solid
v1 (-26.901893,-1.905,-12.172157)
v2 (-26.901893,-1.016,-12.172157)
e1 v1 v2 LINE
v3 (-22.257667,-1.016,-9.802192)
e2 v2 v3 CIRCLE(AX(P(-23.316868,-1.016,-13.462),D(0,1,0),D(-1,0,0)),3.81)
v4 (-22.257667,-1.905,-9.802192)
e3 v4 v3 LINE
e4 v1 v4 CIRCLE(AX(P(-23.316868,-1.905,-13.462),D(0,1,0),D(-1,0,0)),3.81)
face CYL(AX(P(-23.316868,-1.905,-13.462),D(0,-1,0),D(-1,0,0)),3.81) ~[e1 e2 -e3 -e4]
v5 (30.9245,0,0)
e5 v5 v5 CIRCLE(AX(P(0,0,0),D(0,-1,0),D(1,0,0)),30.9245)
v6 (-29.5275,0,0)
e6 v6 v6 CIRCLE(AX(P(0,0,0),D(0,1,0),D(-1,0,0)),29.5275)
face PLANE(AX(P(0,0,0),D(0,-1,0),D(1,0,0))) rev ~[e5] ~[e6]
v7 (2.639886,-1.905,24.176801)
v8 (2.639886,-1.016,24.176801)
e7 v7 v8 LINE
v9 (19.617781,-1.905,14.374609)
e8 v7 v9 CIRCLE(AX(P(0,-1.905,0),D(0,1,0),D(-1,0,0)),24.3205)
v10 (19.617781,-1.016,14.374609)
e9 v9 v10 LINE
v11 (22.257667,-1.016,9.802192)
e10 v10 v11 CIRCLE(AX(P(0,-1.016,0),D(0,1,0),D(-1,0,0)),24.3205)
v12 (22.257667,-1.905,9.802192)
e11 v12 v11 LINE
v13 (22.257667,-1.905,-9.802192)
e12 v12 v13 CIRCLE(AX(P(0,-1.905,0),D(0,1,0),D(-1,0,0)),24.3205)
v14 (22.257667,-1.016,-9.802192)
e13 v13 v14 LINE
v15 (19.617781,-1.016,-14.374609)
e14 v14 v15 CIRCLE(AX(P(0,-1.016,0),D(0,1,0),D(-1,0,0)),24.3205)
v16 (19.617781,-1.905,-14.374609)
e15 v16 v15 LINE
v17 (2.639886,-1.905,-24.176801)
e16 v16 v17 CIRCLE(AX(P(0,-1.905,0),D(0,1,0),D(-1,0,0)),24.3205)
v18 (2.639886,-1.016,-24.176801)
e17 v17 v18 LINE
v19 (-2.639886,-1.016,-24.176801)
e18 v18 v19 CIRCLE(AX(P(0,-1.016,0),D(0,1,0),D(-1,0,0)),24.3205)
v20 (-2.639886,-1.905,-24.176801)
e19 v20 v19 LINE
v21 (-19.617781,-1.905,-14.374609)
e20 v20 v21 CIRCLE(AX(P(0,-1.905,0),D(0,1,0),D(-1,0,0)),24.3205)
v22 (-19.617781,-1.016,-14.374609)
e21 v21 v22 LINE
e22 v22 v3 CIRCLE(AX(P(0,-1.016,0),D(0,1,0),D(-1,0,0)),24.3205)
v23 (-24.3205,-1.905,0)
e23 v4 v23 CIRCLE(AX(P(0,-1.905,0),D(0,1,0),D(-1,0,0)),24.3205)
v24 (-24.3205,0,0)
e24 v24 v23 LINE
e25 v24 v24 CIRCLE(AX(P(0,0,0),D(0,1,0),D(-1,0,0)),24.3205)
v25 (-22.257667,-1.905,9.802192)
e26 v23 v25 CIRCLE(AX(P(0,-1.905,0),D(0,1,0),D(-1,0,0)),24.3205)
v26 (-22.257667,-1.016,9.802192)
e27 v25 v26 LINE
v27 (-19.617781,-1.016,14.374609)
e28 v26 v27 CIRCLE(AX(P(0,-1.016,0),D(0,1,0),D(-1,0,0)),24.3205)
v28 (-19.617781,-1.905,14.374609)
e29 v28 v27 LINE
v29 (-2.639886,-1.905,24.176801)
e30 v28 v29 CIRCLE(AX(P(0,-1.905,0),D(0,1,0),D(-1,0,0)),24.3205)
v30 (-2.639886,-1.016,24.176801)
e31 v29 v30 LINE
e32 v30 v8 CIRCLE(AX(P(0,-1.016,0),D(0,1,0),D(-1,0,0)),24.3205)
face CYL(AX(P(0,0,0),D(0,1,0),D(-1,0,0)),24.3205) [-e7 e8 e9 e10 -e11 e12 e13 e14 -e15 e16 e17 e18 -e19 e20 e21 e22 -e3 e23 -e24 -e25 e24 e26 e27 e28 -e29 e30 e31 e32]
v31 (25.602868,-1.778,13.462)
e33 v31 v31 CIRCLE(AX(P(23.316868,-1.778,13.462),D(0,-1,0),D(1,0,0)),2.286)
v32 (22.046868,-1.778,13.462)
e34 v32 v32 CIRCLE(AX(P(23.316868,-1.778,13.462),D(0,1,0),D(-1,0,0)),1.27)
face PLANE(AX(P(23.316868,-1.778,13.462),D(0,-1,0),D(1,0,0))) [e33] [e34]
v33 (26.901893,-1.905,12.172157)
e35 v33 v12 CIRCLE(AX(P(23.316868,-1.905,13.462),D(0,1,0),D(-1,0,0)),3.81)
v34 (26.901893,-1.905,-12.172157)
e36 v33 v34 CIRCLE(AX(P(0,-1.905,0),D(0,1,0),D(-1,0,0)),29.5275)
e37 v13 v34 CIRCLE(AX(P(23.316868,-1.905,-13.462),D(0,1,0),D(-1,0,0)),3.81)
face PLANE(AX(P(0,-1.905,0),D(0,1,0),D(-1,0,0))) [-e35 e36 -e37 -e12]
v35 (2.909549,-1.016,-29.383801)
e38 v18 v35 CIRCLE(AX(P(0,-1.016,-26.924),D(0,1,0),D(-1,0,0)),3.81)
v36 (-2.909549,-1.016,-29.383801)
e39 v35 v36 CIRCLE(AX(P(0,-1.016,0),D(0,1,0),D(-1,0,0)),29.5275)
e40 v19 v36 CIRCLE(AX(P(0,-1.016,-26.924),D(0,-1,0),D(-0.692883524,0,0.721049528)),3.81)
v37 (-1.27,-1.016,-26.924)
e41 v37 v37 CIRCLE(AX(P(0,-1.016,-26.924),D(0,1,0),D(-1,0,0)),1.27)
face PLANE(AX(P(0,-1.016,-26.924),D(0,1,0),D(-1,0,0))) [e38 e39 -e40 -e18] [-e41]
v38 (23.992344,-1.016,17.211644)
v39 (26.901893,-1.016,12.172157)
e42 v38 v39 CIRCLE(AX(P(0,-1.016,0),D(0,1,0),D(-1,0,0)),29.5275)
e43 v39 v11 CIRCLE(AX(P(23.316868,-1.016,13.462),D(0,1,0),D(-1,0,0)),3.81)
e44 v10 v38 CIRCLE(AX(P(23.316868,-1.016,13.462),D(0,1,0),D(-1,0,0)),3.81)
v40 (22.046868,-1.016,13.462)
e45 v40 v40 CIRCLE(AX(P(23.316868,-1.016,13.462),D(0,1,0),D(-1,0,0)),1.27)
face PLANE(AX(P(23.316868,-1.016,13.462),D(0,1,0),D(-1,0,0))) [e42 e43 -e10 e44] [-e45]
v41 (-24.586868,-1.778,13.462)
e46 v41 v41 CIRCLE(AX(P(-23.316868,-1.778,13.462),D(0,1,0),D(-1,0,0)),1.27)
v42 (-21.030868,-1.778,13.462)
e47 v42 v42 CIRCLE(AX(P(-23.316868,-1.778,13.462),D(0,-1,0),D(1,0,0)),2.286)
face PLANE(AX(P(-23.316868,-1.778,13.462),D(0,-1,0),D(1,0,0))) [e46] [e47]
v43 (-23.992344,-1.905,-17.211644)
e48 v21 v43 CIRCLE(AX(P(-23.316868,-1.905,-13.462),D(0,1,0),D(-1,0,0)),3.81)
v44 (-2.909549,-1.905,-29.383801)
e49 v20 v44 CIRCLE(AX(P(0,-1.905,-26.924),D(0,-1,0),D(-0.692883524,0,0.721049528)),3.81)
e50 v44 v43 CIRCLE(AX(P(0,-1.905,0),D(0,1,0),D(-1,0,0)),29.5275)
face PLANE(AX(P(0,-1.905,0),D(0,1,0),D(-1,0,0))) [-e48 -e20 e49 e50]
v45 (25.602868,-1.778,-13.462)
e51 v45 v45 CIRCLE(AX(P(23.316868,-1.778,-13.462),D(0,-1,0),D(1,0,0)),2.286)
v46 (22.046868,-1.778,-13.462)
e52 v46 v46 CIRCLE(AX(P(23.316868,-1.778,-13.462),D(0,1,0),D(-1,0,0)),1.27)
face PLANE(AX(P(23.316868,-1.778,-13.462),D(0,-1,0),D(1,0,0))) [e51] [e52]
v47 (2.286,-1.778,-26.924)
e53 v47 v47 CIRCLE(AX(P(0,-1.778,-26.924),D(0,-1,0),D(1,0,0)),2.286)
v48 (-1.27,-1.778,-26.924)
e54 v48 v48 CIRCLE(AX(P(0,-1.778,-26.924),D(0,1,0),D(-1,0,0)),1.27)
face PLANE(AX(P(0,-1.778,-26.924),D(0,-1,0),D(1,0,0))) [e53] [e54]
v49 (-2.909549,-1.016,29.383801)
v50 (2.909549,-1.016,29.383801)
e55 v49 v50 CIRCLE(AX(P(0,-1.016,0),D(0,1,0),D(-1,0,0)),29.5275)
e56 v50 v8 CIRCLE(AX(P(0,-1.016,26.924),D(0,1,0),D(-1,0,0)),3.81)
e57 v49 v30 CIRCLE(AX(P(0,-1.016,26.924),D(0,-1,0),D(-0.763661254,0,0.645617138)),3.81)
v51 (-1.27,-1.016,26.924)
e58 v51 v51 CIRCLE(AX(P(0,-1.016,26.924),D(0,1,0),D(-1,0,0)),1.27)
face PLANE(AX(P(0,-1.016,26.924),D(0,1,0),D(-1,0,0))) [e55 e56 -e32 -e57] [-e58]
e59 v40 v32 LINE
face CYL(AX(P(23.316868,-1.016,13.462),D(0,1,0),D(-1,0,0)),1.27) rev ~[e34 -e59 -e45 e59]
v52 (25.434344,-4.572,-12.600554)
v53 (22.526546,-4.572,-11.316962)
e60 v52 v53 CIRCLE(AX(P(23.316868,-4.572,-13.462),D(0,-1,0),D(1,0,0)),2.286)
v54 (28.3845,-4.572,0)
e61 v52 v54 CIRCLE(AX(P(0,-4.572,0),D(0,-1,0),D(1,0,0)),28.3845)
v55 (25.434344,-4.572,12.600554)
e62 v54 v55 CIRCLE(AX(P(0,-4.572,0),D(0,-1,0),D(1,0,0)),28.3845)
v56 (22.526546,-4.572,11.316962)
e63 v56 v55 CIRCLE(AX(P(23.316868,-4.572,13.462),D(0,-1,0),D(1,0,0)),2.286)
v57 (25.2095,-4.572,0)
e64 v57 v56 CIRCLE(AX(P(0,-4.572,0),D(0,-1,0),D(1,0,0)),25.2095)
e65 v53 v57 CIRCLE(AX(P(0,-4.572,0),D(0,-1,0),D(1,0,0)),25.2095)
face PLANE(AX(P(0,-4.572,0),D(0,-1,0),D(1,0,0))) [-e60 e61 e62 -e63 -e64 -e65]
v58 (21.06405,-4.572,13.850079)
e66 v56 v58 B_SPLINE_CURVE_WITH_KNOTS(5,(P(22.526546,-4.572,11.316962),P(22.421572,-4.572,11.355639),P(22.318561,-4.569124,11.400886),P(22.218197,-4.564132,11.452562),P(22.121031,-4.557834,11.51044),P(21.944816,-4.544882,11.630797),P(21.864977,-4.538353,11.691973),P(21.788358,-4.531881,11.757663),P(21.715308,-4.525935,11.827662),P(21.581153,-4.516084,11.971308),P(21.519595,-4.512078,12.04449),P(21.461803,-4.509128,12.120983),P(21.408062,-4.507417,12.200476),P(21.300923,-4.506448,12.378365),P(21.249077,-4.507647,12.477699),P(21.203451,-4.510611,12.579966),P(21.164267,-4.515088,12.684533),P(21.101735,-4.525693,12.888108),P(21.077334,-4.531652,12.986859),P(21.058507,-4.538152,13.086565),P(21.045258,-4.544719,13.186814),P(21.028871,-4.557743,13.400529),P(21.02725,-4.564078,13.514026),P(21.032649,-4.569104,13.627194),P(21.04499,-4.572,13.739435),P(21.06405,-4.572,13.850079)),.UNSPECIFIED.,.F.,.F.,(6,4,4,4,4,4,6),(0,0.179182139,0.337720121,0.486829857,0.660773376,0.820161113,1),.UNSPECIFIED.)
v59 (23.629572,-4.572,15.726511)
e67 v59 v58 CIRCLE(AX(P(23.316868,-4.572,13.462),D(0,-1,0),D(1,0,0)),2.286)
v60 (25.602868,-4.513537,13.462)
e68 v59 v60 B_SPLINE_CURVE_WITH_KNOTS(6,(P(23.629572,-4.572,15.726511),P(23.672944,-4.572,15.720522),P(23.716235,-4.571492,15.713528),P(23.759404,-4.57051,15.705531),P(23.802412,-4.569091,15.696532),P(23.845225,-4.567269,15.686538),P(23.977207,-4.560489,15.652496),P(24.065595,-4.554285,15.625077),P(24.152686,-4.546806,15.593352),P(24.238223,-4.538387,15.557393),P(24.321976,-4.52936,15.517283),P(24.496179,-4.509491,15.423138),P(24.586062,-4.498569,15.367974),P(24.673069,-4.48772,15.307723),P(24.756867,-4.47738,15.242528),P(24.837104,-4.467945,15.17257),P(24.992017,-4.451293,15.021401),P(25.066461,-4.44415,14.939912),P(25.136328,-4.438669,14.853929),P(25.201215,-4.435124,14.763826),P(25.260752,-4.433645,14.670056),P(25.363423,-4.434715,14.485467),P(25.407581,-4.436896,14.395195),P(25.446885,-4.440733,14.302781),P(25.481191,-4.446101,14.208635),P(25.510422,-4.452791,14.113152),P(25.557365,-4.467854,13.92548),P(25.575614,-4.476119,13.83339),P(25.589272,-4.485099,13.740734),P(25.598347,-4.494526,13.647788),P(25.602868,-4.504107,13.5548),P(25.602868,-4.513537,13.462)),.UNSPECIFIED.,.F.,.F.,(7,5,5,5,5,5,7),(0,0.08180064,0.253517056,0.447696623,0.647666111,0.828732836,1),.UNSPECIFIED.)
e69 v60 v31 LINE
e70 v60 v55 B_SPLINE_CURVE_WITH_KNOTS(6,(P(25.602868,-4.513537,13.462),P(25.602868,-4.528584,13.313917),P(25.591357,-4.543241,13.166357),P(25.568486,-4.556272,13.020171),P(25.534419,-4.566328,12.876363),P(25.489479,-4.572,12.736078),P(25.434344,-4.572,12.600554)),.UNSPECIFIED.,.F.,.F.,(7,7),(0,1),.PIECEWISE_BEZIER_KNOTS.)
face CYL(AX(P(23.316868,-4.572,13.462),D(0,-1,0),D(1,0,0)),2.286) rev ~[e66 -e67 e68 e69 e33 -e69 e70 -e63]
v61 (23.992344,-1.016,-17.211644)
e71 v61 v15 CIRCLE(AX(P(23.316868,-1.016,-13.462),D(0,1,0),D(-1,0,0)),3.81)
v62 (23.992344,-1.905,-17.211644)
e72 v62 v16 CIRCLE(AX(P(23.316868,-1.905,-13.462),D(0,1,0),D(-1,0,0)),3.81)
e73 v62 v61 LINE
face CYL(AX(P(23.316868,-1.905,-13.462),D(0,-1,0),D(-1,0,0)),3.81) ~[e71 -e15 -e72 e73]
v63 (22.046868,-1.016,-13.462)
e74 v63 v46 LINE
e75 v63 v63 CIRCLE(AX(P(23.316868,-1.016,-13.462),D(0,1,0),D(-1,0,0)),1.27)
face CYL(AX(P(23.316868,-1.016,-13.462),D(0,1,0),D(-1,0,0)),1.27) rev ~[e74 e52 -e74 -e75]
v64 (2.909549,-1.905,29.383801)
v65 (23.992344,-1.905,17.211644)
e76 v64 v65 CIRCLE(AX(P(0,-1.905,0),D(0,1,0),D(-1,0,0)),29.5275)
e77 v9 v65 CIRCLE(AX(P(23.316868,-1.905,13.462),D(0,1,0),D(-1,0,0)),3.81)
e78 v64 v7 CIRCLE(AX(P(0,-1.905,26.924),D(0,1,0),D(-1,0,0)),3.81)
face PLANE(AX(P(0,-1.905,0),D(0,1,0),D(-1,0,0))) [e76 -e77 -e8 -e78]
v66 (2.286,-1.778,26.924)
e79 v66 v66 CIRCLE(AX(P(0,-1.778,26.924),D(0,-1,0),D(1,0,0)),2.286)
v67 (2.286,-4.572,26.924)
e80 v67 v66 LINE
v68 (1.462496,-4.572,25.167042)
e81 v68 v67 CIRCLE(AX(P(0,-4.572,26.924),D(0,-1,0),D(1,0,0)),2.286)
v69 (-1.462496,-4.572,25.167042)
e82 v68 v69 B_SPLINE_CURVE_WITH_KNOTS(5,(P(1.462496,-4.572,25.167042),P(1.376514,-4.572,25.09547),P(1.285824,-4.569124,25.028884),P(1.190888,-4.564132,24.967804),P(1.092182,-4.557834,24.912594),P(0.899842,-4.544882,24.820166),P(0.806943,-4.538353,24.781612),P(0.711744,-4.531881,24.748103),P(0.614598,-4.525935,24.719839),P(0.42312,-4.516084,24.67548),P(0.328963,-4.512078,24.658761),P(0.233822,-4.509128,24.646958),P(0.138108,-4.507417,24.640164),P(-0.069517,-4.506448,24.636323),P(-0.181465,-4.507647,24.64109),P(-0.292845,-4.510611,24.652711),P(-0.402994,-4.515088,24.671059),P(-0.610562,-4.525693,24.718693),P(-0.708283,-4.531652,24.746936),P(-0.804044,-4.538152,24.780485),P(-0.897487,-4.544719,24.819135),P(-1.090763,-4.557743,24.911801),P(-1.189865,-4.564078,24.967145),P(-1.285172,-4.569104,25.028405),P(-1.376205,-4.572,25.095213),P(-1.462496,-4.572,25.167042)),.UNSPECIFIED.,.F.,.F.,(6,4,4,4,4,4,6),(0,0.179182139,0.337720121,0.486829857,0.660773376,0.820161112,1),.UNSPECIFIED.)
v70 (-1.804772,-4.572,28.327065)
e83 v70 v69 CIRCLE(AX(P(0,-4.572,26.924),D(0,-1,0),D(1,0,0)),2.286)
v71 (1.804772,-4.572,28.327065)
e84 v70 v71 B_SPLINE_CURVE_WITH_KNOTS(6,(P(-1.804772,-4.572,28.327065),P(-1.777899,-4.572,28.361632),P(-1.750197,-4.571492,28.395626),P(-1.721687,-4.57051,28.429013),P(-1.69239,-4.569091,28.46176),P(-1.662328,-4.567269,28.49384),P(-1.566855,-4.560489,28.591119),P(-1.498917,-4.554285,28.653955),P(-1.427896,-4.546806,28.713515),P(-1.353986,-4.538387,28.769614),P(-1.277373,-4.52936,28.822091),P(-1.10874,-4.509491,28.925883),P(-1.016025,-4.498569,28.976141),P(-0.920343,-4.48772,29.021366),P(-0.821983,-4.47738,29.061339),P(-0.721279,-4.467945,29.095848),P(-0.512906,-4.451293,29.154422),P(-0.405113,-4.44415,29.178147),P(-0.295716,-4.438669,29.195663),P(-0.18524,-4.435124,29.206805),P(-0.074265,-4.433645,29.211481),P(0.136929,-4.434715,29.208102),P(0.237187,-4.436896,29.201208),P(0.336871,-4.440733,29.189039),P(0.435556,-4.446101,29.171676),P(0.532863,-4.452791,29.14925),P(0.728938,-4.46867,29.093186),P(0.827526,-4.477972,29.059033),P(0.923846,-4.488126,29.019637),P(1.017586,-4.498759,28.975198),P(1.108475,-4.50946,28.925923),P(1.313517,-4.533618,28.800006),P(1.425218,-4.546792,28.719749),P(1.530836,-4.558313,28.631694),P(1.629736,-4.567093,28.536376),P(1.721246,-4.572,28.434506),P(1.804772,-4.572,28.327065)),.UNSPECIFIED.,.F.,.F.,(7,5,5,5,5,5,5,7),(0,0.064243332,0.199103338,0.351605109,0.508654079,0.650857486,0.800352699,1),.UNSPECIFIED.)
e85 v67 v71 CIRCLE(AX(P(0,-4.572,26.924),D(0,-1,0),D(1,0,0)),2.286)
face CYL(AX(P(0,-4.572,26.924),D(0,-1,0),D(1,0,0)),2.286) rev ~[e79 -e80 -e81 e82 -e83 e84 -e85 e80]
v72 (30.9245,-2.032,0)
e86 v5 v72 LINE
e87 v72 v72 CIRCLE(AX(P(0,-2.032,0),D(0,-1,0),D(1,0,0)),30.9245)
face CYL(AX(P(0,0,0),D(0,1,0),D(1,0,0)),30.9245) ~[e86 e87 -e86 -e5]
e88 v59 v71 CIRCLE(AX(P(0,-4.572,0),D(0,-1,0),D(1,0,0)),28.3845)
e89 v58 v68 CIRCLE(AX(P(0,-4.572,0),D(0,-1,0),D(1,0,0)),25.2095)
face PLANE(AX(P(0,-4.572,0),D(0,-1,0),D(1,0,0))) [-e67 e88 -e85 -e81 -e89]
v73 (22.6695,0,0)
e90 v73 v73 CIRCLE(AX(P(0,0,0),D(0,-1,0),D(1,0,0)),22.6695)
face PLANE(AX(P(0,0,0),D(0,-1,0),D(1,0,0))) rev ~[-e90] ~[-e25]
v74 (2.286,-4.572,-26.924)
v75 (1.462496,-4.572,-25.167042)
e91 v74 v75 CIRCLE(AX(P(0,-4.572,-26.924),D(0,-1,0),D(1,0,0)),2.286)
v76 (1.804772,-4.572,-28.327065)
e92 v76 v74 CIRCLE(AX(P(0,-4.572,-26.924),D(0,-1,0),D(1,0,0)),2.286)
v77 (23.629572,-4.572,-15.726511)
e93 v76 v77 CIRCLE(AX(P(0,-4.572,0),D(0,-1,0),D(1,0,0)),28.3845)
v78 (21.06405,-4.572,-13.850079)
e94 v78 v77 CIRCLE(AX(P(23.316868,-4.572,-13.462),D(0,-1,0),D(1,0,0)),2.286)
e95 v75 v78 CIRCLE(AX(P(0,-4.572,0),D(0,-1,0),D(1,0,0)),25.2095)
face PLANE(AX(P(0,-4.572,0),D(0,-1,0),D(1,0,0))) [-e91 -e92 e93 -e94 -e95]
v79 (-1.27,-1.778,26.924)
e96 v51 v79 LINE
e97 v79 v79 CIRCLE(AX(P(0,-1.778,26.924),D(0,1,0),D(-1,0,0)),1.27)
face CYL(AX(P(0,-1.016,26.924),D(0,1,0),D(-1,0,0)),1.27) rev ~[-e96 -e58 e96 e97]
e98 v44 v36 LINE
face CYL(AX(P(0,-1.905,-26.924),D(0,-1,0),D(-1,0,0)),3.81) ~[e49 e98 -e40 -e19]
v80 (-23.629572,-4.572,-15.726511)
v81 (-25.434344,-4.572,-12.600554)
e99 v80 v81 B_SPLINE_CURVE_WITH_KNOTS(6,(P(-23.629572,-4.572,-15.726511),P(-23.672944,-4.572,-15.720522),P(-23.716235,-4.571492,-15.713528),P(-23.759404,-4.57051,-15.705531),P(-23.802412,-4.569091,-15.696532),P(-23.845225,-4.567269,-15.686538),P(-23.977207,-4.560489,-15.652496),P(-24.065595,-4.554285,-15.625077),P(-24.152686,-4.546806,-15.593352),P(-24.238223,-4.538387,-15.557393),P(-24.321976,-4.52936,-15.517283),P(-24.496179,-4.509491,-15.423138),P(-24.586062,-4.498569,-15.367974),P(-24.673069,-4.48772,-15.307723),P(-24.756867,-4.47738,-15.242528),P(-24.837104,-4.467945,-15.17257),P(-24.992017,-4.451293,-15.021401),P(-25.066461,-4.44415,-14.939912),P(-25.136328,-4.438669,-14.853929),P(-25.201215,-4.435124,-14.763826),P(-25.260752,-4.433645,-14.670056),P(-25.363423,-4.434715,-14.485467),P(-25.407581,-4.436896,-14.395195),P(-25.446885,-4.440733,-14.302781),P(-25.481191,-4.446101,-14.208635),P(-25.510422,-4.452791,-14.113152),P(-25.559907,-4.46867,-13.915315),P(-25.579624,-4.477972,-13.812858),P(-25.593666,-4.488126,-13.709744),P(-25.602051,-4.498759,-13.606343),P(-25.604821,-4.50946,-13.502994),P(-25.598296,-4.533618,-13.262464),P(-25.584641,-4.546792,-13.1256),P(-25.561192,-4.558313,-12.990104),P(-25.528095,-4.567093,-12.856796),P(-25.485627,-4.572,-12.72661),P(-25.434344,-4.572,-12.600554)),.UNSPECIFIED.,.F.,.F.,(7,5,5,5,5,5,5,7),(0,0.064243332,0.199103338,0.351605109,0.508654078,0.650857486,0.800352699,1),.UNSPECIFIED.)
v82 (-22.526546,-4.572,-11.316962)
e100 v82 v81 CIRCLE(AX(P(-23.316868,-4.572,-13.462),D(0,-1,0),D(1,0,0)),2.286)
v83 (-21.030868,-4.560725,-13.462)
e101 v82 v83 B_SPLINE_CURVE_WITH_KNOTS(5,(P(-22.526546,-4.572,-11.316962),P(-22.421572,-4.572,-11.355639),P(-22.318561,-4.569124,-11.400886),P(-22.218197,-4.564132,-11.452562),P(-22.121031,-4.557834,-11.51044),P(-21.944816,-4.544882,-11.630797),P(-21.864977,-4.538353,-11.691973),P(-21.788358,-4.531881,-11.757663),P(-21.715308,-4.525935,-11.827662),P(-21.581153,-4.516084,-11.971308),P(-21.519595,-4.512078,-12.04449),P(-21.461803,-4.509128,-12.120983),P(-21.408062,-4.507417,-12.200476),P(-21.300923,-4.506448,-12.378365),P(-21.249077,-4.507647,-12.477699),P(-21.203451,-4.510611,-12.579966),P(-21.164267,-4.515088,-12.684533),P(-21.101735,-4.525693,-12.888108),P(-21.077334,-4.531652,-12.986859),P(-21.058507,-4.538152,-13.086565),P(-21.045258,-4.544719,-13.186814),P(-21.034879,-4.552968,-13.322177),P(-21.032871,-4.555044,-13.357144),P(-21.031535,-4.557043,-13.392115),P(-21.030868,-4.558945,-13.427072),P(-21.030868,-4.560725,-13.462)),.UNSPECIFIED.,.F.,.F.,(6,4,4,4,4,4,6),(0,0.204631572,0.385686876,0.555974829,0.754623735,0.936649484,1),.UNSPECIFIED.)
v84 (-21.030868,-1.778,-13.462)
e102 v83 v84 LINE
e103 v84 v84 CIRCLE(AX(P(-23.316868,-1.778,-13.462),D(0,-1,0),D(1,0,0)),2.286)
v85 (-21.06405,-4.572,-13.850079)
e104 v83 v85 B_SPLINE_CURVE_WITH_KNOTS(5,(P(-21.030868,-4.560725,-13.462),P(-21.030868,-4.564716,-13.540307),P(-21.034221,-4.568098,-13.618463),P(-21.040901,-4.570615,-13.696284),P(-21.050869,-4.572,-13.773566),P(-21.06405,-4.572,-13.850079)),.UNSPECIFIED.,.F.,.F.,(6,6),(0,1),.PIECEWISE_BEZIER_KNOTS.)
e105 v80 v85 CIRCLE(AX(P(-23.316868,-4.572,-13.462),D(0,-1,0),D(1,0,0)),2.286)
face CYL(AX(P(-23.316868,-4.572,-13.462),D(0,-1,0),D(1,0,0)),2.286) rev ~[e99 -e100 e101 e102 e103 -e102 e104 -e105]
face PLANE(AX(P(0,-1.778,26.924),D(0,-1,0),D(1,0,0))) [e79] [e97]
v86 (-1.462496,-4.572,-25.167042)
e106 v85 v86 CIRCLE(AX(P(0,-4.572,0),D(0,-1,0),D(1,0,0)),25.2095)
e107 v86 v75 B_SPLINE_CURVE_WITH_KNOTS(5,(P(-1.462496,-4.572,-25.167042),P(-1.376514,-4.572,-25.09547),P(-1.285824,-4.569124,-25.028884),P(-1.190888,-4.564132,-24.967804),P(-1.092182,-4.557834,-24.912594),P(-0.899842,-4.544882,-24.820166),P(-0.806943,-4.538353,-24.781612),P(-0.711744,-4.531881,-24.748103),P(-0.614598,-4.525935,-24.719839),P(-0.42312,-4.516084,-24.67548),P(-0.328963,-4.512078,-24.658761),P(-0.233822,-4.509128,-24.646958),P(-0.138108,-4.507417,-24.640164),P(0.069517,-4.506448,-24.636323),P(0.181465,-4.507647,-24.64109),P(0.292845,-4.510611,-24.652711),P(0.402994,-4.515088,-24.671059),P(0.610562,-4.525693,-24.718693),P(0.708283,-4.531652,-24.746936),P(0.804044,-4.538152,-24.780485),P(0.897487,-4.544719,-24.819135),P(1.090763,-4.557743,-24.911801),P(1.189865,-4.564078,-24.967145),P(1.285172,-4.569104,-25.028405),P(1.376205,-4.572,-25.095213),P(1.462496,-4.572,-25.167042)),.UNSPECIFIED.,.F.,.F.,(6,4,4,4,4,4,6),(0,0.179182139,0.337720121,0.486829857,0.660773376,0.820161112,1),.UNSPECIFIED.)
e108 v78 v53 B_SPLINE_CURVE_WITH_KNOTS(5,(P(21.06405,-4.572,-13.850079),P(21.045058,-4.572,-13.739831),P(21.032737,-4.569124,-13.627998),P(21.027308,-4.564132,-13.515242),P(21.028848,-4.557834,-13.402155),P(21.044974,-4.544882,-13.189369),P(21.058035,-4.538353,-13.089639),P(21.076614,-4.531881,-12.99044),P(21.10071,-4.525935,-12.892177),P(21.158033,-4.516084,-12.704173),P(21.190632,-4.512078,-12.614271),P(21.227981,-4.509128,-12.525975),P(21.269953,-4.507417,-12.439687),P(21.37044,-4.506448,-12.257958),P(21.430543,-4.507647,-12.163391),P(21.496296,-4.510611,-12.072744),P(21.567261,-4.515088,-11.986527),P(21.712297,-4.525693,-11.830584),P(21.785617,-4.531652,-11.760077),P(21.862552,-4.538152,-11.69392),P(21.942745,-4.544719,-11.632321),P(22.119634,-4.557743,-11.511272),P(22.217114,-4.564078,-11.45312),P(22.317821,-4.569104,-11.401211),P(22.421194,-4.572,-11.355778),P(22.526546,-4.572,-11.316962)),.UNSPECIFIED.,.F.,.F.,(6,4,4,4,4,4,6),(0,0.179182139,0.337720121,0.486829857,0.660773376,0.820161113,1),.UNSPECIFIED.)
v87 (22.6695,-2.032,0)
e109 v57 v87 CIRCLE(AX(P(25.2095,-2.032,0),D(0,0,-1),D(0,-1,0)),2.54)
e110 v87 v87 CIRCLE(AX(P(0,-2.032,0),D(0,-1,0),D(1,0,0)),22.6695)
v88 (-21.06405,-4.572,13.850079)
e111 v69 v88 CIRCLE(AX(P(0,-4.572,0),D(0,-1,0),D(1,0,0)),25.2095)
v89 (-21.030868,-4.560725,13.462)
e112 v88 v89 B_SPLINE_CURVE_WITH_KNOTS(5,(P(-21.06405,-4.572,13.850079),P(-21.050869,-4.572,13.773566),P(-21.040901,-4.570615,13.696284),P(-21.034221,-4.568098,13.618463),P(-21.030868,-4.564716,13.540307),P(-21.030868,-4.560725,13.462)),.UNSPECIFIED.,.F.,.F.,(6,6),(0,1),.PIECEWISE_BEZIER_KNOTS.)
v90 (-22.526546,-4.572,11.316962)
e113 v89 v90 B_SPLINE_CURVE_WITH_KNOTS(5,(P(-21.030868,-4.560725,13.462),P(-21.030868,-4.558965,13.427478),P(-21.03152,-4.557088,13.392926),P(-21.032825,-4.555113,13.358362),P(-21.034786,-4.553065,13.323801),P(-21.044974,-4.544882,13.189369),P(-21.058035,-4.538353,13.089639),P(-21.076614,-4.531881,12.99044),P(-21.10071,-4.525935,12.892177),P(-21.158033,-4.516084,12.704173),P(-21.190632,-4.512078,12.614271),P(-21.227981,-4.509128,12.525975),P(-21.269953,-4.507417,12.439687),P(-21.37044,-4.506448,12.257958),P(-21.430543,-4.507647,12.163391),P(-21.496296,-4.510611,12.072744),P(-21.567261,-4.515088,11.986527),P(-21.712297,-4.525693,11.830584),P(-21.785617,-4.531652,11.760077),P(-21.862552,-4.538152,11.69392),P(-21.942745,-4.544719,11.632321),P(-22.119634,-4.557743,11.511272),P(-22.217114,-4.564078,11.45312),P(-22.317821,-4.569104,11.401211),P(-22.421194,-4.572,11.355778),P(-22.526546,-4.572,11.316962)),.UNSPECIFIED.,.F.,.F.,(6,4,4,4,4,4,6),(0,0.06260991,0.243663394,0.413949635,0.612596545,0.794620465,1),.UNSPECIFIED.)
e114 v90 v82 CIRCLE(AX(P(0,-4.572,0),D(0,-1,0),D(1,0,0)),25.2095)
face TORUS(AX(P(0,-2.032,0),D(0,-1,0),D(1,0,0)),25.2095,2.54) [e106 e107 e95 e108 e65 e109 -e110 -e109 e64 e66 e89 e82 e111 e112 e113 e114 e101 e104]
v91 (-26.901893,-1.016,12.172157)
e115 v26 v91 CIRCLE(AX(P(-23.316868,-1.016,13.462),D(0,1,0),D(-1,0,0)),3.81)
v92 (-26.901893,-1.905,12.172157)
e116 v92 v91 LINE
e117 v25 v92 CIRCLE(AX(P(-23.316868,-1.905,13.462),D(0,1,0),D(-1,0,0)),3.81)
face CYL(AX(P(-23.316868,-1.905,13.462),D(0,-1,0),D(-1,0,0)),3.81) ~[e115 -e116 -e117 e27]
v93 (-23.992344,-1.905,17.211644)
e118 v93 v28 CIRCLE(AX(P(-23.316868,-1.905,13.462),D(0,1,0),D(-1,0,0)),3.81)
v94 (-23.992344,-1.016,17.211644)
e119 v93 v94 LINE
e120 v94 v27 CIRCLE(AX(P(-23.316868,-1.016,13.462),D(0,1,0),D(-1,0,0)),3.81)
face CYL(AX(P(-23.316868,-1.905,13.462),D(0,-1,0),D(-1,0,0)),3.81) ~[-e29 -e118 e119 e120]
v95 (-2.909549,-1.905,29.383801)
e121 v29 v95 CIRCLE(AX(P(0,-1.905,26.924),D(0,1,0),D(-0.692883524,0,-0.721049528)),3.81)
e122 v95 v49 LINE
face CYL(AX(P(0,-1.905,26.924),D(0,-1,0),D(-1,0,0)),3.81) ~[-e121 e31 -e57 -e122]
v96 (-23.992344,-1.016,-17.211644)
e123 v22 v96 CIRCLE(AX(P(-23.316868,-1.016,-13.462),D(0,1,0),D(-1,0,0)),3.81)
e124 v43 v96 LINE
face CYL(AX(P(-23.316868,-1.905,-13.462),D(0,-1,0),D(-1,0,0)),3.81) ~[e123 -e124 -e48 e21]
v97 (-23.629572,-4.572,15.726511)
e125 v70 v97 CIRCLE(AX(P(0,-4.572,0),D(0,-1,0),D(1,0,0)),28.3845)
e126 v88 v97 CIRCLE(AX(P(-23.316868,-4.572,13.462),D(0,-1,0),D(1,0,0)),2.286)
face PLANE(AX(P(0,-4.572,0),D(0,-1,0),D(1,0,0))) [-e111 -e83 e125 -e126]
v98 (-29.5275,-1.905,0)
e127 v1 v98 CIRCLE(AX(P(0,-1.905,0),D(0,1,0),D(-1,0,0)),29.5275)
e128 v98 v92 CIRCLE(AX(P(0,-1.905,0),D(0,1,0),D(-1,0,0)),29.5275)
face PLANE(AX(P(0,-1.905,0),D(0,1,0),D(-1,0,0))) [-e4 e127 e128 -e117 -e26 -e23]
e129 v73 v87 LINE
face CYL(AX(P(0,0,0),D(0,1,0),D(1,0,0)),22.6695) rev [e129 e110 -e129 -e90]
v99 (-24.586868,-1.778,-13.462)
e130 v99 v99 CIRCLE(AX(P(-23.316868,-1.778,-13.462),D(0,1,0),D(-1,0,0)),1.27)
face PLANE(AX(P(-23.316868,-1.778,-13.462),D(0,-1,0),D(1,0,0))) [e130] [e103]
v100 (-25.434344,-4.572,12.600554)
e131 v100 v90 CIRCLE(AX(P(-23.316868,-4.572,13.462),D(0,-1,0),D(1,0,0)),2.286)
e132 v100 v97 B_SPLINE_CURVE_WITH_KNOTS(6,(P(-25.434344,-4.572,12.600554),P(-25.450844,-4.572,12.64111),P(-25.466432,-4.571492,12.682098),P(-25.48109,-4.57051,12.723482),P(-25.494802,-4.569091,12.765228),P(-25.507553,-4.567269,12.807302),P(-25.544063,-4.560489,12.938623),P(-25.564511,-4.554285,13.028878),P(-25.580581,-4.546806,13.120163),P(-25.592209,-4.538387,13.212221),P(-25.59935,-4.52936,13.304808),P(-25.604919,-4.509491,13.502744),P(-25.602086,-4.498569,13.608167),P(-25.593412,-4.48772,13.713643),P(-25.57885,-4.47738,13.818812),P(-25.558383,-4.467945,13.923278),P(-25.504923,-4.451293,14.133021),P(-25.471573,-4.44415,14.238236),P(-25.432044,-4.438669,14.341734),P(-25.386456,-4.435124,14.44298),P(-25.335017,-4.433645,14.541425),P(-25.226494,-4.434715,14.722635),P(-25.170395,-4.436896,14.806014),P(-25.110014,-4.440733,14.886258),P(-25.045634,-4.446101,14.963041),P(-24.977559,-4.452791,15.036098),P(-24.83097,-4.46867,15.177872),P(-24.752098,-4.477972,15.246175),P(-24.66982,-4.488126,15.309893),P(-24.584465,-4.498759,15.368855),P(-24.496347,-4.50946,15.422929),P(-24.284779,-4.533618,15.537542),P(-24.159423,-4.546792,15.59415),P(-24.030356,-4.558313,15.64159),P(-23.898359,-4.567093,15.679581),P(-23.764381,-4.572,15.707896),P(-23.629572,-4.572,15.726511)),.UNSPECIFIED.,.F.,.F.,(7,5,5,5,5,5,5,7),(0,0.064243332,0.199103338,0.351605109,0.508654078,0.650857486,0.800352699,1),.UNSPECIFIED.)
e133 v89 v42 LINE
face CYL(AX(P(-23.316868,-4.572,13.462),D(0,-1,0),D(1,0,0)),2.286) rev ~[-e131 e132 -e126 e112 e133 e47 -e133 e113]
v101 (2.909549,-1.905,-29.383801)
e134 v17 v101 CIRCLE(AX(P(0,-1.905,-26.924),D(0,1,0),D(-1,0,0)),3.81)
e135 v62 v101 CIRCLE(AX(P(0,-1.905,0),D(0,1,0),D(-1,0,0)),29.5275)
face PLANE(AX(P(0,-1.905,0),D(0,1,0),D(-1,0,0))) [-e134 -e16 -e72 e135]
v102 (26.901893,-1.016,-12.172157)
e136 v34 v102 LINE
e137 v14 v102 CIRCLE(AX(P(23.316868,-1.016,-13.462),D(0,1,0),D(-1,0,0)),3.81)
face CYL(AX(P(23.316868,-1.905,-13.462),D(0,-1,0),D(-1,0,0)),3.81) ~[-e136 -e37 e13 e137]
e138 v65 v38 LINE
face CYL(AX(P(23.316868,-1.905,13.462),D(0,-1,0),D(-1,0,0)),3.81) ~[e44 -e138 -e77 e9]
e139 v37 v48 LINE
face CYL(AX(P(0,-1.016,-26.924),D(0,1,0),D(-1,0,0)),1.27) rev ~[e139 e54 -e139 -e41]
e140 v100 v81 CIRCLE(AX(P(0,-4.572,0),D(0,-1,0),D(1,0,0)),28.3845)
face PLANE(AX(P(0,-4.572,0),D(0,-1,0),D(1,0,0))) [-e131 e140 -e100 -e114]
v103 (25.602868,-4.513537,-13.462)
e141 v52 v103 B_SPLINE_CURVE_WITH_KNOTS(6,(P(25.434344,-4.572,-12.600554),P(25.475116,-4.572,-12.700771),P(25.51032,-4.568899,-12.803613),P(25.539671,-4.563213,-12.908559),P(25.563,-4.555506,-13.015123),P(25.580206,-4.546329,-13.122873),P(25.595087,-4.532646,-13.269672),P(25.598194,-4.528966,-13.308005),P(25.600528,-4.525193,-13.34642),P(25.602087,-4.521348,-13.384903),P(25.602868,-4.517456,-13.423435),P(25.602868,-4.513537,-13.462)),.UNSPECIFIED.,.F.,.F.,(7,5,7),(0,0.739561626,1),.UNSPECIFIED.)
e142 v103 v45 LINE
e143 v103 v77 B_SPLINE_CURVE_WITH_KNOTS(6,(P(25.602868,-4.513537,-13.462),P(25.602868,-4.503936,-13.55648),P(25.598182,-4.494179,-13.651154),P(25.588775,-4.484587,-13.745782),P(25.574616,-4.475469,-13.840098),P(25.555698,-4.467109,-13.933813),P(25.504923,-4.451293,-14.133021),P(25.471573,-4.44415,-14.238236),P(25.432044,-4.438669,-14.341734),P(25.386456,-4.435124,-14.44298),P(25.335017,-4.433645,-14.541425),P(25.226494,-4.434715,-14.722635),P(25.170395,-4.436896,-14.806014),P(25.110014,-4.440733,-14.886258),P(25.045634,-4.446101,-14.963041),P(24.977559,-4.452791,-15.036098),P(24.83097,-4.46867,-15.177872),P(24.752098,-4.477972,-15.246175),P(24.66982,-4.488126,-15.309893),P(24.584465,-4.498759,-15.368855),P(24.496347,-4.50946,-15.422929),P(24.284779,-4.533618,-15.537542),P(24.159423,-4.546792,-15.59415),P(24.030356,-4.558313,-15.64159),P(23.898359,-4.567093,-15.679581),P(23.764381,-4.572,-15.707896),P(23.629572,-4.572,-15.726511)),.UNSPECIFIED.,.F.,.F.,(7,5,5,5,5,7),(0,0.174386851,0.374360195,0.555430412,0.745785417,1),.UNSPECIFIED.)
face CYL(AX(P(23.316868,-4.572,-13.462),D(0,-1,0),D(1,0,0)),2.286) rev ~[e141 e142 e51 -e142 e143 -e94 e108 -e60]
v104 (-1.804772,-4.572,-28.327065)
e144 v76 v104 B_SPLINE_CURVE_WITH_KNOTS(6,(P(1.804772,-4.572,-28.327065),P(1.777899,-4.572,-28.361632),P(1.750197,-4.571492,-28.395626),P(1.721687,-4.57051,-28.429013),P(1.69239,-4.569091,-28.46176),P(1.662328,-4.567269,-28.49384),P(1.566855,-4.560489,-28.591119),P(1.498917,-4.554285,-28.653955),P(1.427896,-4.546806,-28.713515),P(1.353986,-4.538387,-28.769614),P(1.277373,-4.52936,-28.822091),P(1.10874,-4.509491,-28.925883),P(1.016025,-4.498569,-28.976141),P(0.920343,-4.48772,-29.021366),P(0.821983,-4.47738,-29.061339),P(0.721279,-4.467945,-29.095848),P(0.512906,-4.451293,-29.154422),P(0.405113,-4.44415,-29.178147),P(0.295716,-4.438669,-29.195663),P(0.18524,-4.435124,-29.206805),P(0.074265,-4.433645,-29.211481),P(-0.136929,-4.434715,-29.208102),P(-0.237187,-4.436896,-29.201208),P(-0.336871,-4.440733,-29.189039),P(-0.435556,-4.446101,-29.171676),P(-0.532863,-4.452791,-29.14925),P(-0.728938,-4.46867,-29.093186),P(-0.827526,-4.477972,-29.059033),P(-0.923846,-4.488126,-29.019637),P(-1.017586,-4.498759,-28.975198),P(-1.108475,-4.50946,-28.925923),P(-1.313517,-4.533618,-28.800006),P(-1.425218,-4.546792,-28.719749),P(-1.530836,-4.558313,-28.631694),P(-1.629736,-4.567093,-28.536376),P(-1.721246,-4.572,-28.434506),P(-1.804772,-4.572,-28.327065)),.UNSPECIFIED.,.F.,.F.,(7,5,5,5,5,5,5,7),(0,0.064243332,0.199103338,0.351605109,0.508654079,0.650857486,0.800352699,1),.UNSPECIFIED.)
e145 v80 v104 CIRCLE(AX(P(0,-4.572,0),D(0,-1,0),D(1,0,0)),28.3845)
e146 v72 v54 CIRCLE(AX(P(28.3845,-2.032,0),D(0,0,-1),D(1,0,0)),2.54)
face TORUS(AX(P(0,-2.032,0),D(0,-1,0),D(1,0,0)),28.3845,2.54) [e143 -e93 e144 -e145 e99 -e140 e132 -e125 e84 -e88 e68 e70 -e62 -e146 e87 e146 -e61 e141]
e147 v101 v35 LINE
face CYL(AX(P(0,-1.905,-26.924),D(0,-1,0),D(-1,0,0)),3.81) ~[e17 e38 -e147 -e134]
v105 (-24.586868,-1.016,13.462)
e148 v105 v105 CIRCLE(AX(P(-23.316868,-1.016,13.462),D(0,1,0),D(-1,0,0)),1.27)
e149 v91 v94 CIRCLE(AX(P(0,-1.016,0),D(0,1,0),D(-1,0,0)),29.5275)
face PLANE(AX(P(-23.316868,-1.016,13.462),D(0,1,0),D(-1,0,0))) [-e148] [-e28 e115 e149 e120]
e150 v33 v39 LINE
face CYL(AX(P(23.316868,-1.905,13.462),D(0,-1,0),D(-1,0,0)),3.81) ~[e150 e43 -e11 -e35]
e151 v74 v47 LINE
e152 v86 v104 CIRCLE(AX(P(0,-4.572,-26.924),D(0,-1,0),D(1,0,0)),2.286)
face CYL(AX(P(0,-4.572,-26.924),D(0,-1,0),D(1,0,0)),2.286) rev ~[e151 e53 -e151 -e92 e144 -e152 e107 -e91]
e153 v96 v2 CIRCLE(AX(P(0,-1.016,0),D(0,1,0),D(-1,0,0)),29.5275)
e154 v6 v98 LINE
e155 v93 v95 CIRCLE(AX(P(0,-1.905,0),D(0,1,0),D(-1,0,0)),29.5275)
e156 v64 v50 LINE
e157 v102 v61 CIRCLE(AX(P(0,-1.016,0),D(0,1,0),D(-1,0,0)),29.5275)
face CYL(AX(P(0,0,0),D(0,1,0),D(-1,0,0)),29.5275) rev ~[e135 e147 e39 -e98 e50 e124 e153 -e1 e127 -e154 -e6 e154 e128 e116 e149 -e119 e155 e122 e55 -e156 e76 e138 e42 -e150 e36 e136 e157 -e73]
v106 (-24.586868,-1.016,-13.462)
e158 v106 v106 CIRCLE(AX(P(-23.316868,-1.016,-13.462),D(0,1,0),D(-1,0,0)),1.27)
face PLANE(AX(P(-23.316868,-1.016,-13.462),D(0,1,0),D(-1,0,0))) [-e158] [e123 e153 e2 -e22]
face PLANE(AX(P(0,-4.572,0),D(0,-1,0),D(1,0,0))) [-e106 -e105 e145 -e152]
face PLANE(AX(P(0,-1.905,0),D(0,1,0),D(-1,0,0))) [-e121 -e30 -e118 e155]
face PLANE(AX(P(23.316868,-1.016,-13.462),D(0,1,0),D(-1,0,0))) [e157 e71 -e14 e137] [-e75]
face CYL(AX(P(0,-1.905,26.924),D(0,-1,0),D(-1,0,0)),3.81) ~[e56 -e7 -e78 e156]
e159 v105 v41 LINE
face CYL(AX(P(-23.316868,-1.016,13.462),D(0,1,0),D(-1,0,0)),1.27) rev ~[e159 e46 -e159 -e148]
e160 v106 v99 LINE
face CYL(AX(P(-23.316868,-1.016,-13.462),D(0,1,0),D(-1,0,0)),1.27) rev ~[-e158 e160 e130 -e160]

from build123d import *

# Parameters (mm, degrees)
F0_R     = 30.9245
F0_R_2   = 22.6695
F1_DEPTH = 4.572
F2_R     = 29.5275
F2_R_2   = 24.3205
F3_DEPTH = 1.905
F4_R     = 3.81
F5_DEPTH = 0.889
F6_R     = 1.27
F7_DEPTH = 3.557
F8_R     = 2.286
F9_DEPTH = 2.794


# Not quite as in the source:
# - a fillet or chamfer that OpenCascade refuses, or shapes differently, is made with other operations: its cross-section is extruded or revolved along the edge and cut away or added


with BuildPart() as f1:
    # F0 (on Front) → F1 (new body)
    with BuildSketch(Plane.XZ):
        Circle(F0_R)
        Circle(F0_R_2, mode=Mode.SUBTRACT)
    extrude(amount=F1_DEPTH)

    # F2 (on face) → F3 (cut)
    with BuildSketch(Plane(origin=(0, 0, 0), x_dir=(-1, 0, 0), z_dir=(0, 1, 0))):
        Circle(F2_R)
        Circle(F2_R_2, mode=Mode.SUBTRACT)
    extrude(amount=-F3_DEPTH, mode=Mode.SUBTRACT)

    # F4 (on face) → F5 (join)
    with BuildSketch(Plane(origin=(0, -1.905, 0), x_dir=(-1, 0, 0), z_dir=(0, 1, 0))):
        with Locations((0, 26.924)):
            Circle(F4_R)
        with Locations((-23.3168679715, 13.462)):
            Circle(F4_R)
        with Locations((-23.3168679715, -13.462)):
            Circle(F4_R)
        with Locations((0, -26.924)):
            Circle(F4_R)
        with Locations((23.3168679715, -13.462)):
            Circle(F4_R)
        with Locations((23.3168679715, 13.462)):
            Circle(F4_R)
    extrude(amount=F5_DEPTH)

    # F6 (on face) → F7 (cut, through all)
    with BuildSketch(Plane(origin=(0, -1.016, 0), x_dir=(-1, 0, 0), z_dir=(0, 1, 0))):
        with Locations((0, 26.924)):
            Circle(F6_R)
        with Locations((-23.3168679715, 13.462)):
            Circle(F6_R)
        with Locations((-23.3168679715, -13.462)):
            Circle(F6_R)
        with Locations((0, -26.924)):
            Circle(F6_R)
        with Locations((23.3168679715, -13.462)):
            Circle(F6_R)
        with Locations((23.3168679715, 13.462)):
            Circle(F6_R)
    extrude(amount=-F7_DEPTH, mode=Mode.SUBTRACT)

    # F8 (on face) → F9 (cut)
    with BuildSketch(Plane.XZ.offset(4.572)):
        with Locations((0, 26.924)):
            Circle(F8_R)
        with Locations((-23.3168679715, 13.462)):
            Circle(F8_R)
        with Locations((-23.3168679715, -13.462)):
            Circle(F8_R)
        with Locations((0, -26.924)):
            Circle(F8_R)
        with Locations((23.3168679715, -13.462)):
            Circle(F8_R)
        with Locations((23.3168679715, 13.462)):
            Circle(F8_R)
    extrude(amount=-F9_DEPTH, mode=Mode.SUBTRACT)

    # F10: fillet of radius 2.54 on 2 edges, made by hand

    # F10_s1 → F10_t2 (revolve, cut)
    with BuildSketch(Plane.XY):
        with BuildLine():
            ThreePointArc((30.9245, -2.032), (30.1805512242, -3.8280512242), (28.3845, -4.572))
            Line((28.3845, -4.572), (30.9245, -4.572))
            Line((30.9245, -4.572), (30.9245, -2.032))
        make_face()
    revolve(axis=Axis((0, -4.572, 0), (0, -1, 0)), mode=Mode.SUBTRACT)

    # F10_s3 → F10_t4 (revolve, cut)
    with BuildSketch(Plane.XY):
        with BuildLine():
            ThreePointArc((25.2095, -4.572), (23.4134487758, -3.8280512242), (22.6695, -2.032))
            Line((22.6695, -2.032), (22.6695, -4.572))
            Line((22.6695, -4.572), (25.2095, -4.572))
        make_face()
    revolve(axis=Axis((0, -4.572, 0), (0, -1, 0)), mode=Mode.SUBTRACT)


solid = f1.part
